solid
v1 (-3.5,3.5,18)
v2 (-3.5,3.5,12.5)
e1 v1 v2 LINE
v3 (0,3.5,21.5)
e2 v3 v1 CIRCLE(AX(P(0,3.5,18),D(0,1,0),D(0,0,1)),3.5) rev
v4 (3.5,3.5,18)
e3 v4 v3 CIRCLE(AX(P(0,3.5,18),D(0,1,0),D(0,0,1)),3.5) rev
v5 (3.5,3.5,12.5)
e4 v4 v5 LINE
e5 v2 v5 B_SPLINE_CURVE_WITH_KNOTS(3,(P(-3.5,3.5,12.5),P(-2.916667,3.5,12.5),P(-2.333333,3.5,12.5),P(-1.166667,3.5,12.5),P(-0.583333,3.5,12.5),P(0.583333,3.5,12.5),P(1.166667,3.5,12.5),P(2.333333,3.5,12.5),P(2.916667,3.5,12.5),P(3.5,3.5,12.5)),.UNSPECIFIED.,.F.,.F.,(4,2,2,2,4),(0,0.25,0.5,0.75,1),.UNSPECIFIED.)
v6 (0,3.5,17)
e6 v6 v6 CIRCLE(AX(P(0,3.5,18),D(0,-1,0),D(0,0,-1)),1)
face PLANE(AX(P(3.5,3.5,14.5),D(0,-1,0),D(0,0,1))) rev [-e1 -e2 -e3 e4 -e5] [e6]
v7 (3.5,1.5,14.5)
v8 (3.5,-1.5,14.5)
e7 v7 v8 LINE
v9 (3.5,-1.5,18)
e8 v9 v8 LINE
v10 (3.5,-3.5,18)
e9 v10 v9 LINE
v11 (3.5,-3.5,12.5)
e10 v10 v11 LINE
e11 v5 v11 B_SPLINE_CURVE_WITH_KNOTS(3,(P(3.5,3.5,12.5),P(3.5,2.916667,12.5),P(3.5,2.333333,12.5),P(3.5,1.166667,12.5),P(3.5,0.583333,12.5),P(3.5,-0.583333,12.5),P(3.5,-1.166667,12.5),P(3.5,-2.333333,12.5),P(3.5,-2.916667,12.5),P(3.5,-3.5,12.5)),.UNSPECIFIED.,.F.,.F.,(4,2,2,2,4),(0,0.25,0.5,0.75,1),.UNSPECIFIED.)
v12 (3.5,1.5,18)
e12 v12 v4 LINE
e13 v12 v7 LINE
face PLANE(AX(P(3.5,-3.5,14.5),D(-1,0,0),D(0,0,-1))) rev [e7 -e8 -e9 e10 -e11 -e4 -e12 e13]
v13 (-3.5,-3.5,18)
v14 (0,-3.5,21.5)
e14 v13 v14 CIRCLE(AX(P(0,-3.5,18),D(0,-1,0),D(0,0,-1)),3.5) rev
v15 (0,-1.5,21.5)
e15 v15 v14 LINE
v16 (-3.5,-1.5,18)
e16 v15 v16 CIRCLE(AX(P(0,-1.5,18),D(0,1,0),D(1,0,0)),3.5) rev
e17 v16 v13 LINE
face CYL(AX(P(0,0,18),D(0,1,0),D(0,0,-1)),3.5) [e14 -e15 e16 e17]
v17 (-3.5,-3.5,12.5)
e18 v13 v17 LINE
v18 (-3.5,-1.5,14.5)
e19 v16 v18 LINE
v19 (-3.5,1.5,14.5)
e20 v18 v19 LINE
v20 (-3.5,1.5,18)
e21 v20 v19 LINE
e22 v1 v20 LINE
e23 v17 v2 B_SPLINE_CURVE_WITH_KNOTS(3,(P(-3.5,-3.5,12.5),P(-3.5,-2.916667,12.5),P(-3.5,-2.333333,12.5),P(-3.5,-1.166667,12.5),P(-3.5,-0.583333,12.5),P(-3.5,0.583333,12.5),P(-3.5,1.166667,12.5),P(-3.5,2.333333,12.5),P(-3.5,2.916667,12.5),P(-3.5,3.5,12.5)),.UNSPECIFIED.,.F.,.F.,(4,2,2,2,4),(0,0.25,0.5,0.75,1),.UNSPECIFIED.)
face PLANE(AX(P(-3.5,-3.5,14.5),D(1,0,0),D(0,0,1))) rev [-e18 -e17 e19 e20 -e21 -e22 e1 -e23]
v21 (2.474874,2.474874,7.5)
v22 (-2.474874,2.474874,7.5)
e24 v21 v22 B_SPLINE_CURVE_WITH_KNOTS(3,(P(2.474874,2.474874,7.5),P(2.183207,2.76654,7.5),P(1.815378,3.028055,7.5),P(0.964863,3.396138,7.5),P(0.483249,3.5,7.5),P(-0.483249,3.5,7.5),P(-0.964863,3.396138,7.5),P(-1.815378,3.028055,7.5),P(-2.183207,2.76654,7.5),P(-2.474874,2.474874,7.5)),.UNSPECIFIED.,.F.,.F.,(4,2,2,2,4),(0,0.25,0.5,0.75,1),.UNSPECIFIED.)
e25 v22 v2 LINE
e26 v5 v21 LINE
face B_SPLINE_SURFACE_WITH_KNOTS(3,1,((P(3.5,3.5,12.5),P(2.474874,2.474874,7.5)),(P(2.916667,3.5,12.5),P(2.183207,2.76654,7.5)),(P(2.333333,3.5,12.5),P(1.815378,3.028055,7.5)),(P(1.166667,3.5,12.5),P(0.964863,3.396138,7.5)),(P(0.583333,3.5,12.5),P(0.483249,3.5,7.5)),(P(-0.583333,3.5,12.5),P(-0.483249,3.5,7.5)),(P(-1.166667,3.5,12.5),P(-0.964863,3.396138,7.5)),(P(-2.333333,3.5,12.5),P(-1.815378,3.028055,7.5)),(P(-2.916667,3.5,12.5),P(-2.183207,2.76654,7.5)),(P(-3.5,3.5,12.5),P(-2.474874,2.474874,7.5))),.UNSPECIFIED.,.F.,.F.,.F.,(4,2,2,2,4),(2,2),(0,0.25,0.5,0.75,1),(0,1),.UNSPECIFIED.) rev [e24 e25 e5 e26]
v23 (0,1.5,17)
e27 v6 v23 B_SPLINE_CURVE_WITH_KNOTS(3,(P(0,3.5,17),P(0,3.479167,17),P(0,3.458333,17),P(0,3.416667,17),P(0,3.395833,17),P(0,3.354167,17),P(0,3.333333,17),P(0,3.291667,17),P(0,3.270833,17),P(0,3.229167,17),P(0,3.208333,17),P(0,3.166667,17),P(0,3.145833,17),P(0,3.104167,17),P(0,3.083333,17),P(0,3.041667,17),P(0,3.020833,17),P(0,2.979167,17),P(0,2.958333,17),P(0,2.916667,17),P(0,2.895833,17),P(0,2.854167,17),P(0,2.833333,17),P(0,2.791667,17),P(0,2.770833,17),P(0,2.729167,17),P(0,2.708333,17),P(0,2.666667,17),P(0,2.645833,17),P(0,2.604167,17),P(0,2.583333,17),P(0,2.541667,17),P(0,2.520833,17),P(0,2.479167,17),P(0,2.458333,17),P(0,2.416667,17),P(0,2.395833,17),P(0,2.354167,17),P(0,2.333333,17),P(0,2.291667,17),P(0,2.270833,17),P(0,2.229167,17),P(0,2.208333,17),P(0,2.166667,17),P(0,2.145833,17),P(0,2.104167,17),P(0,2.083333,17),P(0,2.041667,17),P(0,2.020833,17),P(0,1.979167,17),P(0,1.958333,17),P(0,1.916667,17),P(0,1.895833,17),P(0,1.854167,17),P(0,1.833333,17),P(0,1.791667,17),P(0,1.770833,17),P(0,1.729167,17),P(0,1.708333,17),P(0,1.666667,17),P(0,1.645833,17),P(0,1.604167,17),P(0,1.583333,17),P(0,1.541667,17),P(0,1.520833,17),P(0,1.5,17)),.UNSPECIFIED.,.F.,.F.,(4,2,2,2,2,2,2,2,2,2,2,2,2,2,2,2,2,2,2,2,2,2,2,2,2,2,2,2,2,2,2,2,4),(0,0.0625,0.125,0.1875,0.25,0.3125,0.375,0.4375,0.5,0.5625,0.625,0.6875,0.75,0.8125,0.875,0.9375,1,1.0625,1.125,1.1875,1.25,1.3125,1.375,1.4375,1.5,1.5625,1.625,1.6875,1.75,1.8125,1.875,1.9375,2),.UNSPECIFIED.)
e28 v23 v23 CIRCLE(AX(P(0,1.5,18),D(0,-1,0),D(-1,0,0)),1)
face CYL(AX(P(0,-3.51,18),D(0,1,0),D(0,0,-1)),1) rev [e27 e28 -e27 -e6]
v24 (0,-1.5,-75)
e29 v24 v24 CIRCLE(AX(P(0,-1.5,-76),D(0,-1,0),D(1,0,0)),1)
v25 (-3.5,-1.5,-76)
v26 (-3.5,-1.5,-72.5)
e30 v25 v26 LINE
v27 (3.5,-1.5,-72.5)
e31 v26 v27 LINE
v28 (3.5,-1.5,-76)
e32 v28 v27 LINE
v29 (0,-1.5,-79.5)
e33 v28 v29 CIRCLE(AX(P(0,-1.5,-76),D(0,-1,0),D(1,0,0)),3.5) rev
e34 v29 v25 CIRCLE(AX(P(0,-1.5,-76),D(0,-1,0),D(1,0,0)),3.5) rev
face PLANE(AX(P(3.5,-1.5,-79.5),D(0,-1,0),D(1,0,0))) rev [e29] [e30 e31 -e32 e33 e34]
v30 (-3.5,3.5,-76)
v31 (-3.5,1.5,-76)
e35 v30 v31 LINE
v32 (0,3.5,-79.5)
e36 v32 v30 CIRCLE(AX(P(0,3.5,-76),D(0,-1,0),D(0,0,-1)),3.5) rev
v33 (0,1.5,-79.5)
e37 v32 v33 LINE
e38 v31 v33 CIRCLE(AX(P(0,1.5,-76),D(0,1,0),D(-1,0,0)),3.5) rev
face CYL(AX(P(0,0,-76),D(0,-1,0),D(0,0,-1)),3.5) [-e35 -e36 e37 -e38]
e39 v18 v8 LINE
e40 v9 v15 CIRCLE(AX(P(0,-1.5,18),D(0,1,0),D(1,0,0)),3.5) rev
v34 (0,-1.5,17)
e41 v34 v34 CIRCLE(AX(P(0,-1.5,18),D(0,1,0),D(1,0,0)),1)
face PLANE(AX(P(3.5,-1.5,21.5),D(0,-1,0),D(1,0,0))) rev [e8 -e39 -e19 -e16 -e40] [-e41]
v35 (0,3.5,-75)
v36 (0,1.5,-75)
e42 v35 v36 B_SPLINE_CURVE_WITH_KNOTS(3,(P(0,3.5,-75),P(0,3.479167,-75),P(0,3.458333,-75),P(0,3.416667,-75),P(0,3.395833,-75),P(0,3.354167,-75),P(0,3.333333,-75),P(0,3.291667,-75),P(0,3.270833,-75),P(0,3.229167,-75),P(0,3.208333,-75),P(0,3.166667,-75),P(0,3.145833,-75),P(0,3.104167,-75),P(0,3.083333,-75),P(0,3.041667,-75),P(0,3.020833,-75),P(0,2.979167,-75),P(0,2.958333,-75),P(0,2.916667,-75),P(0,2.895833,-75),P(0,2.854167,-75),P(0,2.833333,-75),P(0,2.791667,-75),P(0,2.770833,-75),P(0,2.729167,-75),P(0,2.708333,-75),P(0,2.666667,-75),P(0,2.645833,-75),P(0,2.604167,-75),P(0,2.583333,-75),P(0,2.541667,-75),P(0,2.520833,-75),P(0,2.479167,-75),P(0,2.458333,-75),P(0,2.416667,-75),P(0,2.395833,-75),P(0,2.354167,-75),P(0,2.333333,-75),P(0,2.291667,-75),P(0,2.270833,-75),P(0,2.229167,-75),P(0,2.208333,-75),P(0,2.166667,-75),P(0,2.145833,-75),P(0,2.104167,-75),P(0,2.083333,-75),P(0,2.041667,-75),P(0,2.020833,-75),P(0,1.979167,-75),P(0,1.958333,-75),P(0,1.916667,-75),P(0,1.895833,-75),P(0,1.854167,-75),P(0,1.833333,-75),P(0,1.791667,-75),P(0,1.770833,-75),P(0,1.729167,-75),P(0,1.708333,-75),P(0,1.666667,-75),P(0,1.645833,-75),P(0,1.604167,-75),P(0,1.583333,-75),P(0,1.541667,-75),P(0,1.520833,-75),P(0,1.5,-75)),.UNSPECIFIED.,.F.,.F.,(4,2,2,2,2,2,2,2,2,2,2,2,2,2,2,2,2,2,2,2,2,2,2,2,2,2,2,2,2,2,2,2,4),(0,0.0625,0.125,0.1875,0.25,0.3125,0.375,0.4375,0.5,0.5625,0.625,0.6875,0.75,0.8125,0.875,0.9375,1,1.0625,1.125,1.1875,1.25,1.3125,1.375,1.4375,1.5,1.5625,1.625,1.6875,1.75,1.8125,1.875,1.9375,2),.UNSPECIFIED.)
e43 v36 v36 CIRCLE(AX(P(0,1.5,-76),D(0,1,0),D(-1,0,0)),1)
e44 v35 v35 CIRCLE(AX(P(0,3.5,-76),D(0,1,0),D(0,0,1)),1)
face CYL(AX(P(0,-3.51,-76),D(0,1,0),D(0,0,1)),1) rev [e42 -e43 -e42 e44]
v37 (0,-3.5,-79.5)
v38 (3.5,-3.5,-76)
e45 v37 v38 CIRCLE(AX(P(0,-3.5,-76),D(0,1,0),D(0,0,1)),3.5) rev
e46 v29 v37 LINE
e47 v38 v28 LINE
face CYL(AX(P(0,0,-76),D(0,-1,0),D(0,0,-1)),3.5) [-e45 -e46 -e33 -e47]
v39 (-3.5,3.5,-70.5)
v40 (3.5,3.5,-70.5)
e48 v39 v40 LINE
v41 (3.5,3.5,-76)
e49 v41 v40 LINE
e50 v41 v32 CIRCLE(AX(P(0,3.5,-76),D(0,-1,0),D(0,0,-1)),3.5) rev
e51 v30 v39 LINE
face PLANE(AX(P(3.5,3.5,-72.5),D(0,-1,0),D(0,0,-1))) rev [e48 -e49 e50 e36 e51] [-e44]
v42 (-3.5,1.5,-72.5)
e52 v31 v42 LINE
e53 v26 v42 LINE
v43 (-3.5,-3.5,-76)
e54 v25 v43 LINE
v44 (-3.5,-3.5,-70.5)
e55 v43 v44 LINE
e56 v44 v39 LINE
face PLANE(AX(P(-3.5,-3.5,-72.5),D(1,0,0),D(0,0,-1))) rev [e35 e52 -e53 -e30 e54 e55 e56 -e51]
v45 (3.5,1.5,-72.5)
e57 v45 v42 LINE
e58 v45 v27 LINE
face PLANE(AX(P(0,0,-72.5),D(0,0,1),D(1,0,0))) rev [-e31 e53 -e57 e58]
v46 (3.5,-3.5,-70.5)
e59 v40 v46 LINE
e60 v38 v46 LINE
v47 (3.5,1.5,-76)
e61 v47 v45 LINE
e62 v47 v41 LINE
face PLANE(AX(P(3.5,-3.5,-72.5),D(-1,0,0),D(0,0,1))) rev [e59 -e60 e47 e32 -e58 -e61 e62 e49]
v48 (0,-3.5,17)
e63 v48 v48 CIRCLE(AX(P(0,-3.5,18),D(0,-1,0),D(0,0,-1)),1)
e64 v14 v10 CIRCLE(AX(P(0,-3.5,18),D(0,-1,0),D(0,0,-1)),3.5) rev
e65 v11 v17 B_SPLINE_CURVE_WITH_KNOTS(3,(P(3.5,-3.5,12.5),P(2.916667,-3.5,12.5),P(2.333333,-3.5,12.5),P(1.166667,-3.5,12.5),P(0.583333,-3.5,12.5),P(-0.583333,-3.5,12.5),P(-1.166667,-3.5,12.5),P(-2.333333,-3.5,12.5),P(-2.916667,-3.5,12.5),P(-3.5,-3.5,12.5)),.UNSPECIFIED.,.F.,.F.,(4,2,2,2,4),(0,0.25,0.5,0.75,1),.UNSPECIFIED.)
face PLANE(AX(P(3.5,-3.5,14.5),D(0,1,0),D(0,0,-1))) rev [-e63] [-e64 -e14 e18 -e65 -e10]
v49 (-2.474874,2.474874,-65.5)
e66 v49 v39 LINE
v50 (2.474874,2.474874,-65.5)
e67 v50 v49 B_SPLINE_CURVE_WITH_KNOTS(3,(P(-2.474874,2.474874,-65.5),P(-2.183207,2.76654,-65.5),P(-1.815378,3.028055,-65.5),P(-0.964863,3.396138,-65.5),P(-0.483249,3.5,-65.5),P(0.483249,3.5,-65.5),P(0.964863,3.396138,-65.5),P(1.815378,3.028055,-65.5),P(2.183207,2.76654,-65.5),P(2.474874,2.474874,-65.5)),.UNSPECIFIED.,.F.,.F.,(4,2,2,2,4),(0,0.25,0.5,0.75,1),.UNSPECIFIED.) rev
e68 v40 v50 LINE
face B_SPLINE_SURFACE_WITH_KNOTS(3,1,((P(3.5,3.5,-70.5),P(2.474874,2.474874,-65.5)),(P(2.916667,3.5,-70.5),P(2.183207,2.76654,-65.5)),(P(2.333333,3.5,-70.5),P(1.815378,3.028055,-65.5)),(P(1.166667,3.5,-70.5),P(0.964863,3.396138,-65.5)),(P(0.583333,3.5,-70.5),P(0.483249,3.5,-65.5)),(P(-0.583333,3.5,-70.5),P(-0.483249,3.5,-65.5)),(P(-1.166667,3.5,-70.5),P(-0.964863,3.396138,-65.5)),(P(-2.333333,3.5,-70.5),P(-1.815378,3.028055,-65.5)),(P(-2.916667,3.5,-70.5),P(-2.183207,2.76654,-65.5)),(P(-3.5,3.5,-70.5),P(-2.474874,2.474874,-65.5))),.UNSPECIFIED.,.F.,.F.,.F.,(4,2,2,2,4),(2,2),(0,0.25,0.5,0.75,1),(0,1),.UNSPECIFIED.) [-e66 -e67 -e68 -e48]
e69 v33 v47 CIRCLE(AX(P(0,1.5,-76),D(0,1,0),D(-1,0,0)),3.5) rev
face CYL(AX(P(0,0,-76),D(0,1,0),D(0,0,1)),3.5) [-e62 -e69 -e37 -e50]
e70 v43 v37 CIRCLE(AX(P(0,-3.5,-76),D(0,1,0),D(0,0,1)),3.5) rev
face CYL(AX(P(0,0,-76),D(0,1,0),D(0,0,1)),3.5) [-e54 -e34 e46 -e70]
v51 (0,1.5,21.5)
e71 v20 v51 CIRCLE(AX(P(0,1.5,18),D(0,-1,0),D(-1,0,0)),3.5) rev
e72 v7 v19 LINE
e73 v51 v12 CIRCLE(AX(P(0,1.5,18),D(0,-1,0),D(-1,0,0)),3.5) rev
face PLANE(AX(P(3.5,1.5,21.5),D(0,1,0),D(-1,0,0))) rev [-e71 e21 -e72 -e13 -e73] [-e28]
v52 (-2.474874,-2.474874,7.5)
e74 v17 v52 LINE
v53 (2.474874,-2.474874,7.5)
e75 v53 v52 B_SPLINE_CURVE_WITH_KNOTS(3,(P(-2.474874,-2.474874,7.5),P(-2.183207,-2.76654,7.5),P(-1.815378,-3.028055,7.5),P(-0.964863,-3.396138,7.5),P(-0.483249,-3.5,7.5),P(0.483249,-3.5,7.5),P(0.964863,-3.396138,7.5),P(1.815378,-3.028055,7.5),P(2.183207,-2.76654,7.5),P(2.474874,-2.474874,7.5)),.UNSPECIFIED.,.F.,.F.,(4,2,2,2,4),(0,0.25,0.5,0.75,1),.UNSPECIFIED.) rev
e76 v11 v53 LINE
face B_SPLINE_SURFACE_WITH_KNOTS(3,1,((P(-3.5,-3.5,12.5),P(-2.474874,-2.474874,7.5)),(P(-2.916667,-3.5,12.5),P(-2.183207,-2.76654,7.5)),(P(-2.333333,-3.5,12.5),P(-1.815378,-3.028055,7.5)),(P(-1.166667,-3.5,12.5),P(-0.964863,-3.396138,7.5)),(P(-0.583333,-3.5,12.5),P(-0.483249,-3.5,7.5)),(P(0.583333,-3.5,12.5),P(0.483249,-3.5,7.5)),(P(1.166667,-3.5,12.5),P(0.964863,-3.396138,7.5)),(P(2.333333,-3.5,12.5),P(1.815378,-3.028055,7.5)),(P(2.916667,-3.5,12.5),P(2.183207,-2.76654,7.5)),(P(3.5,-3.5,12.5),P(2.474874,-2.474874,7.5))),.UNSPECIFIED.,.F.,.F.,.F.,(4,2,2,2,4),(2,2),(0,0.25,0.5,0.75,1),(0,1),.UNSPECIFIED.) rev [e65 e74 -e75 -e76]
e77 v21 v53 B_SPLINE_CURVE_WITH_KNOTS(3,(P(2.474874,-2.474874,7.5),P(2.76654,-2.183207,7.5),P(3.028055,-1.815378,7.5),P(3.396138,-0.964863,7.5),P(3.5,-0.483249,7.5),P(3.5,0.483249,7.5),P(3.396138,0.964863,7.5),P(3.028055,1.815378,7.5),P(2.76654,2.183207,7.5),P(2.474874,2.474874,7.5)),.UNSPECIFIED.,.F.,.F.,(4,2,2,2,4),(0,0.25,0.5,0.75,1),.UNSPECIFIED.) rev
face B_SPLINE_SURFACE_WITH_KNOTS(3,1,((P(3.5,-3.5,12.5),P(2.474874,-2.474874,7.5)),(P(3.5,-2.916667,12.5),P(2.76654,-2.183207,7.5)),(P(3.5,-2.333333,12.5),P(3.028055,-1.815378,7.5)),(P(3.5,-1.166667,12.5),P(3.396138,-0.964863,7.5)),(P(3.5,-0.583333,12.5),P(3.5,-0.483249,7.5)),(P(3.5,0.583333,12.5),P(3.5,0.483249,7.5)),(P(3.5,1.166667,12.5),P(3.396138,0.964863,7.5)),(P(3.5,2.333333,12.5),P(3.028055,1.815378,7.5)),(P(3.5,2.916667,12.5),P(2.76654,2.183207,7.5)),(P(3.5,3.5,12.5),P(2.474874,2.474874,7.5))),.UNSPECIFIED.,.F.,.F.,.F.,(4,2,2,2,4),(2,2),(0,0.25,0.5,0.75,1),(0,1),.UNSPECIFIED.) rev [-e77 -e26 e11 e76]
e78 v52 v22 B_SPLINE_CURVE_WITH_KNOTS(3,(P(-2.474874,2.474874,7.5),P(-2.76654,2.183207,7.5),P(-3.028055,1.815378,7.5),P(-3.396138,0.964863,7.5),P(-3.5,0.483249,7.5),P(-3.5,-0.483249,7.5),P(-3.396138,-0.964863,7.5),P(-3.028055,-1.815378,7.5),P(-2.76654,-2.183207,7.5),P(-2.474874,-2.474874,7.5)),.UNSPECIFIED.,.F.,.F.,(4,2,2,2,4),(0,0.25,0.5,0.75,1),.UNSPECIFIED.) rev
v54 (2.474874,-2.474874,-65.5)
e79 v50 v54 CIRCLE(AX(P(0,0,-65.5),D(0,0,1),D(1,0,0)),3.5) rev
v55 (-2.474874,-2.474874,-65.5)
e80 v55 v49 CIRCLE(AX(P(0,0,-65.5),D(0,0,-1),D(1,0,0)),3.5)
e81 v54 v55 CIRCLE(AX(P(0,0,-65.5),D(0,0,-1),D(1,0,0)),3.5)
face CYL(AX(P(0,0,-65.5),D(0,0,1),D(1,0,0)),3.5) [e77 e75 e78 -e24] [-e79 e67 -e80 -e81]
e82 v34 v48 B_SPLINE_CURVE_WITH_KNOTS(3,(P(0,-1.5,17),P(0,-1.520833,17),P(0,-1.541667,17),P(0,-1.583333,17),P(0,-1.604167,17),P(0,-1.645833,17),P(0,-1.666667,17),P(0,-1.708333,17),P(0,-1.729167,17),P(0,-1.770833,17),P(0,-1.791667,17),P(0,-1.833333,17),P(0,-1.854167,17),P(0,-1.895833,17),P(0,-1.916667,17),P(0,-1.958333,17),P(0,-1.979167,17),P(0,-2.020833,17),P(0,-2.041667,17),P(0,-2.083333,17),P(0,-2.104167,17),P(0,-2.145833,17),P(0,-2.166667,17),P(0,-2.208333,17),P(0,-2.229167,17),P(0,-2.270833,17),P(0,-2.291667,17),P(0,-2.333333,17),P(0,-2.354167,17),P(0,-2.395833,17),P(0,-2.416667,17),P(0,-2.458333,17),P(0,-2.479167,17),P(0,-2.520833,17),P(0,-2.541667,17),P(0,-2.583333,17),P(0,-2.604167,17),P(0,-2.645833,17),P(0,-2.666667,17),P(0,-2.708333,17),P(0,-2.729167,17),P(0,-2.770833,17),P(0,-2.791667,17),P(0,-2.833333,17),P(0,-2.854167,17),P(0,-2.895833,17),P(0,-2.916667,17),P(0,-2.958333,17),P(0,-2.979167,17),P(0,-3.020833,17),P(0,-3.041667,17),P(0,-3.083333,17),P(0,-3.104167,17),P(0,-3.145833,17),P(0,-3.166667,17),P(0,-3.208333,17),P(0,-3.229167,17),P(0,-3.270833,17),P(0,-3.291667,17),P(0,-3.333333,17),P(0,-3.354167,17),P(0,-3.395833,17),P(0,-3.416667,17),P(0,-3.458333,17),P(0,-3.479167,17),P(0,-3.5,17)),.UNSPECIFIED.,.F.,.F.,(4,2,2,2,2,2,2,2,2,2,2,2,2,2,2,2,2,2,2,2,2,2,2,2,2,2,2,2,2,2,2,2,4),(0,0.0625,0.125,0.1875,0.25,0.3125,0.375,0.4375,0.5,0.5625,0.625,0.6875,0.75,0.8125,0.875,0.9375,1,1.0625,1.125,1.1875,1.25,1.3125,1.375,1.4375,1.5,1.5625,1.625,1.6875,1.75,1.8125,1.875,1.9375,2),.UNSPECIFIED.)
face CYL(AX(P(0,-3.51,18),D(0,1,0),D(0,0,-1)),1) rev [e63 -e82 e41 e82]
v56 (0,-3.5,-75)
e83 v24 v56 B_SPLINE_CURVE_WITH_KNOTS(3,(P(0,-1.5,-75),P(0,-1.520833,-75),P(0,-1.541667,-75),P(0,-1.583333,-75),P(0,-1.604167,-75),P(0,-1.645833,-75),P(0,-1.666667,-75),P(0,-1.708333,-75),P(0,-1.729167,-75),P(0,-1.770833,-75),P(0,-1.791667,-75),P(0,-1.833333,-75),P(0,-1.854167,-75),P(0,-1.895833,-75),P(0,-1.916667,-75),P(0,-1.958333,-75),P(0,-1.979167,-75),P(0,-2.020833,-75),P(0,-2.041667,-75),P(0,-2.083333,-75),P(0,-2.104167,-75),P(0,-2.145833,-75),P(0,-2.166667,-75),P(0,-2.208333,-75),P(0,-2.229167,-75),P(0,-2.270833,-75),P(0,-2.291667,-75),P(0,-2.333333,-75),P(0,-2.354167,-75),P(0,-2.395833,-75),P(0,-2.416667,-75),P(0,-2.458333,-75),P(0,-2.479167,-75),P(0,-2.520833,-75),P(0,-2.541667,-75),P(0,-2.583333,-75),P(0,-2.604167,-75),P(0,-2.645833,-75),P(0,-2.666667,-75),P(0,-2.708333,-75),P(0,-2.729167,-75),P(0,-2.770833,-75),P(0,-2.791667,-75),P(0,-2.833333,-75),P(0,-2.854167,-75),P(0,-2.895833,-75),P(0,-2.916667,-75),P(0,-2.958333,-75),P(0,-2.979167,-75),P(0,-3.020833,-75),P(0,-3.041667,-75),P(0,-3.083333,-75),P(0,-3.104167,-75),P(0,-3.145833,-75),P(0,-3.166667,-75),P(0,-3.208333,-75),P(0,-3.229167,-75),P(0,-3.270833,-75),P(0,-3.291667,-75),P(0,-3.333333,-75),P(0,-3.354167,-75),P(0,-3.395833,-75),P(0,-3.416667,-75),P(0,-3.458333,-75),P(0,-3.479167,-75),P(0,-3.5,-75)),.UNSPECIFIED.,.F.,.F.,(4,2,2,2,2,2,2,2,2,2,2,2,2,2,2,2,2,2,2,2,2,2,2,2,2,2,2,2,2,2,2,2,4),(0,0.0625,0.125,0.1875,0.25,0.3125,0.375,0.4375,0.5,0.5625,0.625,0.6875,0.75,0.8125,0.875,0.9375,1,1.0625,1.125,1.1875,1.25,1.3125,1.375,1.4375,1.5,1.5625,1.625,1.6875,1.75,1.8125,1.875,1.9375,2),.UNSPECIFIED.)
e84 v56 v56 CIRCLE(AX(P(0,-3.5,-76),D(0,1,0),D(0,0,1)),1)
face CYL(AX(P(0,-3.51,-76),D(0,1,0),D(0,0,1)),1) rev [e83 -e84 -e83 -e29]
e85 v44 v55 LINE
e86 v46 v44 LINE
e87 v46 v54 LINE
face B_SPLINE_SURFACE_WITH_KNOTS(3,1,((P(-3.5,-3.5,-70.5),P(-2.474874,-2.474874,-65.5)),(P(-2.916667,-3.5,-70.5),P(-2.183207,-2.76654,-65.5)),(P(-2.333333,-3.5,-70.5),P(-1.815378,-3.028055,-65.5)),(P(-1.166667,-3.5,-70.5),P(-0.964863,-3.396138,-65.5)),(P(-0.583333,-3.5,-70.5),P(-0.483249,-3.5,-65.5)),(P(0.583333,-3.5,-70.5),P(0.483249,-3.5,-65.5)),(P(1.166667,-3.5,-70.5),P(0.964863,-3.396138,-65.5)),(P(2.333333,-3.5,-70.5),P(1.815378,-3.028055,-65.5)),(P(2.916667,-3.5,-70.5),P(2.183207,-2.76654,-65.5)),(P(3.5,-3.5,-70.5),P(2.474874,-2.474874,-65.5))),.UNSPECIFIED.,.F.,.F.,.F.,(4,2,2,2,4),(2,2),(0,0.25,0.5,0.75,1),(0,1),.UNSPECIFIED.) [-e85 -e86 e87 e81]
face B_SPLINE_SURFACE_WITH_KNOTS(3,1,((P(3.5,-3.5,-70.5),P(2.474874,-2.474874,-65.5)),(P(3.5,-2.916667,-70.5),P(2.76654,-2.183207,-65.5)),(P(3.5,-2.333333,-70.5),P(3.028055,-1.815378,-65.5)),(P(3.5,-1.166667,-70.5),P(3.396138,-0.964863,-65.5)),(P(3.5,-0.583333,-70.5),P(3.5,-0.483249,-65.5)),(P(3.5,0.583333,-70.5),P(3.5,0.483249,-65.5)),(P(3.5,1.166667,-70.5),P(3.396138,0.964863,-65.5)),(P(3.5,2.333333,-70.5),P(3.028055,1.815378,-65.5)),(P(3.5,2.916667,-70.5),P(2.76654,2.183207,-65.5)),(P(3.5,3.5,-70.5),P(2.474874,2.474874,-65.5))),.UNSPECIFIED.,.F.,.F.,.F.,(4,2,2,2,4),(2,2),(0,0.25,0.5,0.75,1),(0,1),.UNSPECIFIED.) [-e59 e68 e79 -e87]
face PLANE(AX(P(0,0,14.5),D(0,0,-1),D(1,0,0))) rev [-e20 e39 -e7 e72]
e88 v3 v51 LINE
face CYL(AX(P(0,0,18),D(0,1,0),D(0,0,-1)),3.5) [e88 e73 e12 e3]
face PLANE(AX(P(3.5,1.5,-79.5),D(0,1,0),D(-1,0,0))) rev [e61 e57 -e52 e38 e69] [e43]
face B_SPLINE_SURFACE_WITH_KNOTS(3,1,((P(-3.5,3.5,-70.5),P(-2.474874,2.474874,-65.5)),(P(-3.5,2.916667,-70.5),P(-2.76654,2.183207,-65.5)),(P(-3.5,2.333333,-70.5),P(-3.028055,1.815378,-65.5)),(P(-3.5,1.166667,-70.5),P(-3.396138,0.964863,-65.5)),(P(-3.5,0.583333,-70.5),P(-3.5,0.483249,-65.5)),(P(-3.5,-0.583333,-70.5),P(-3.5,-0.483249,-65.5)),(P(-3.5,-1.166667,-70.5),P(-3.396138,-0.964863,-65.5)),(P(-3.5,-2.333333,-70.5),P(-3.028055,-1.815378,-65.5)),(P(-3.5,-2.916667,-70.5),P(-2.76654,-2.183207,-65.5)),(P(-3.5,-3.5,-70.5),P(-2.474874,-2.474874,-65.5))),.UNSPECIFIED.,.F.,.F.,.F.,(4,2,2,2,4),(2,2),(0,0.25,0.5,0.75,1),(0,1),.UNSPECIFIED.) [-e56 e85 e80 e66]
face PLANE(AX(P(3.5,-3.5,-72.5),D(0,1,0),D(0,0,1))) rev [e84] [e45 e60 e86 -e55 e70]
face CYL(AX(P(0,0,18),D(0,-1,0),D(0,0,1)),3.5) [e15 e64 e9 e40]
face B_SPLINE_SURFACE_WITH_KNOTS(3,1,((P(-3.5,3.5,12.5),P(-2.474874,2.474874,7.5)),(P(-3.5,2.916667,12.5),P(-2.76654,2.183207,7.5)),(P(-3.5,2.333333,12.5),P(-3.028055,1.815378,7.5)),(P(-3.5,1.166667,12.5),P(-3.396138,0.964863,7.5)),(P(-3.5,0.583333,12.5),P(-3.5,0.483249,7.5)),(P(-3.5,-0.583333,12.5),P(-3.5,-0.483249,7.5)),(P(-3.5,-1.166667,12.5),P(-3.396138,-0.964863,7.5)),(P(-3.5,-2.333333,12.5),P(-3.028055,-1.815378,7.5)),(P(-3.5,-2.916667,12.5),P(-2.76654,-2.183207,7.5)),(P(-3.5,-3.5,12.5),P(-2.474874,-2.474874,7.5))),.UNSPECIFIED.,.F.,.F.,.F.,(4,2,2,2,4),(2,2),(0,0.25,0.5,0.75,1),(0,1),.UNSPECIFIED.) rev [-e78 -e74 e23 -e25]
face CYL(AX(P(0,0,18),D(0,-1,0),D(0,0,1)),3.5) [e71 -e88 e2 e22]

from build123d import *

# Parameters (mm, degrees)
SKETCH1_R           = 3.5
BOSS_EXTRUDE1_DEPTH = 65.5
SKETCH3_2_W         = 7
SKETCH3_2_H         = 7
BOSS_EXTRUDE3_DEPTH = 2
SKETCH4_W           = 7
SKETCH4_H           = 2
BOSS_EXTRUDE2_DEPTH = 7
SKETCH5_R           = 1
CUT_EXTRUDE1_DEPTH  = 80.884291435
FILLET1_R           = 3.5


with BuildPart() as part:
    # Sketch1 → Boss-Extrude1 (new body)
    with BuildSketch(Plane.XY):
        Circle(SKETCH1_R)
    extrude(amount=-BOSS_EXTRUDE1_DEPTH)

    # Loft1: read off the stored shape, not the designer's step
    # Loft1: loft between two sections, ruled curve by curve
    loft1_from = [
        Edge.make_bspline([(-3.5, 3.5, -70.5), (-3.5, 2.916666667, -70.5), (-3.5, 2.333333333, -70.5), (-3.5, 1.166666667, -70.5), (-3.5, 0.583333333, -70.5), (-3.5, -0.583333333, -70.5), (-3.5, -1.166666667, -70.5), (-3.5, -2.333333333, -70.5), (-3.5, -2.916666667, -70.5), (-3.5, -3.5, -70.5)], [0, 0, 0, 0, 0.25, 0.25, 0.5, 0.5, 0.75, 0.75, 1, 1, 1, 1], 3),
        Edge.make_bspline([(-3.5, -3.5, -70.5), (-2.916666667, -3.5, -70.5), (-2.333333333, -3.5, -70.5), (-1.166666667, -3.5, -70.5), (-0.583333333, -3.5, -70.5), (0.583333333, -3.5, -70.5), (1.166666667, -3.5, -70.5), (2.333333333, -3.5, -70.5), (2.916666667, -3.5, -70.5), (3.5, -3.5, -70.5)], [0, 0, 0, 0, 0.25, 0.25, 0.5, 0.5, 0.75, 0.75, 1, 1, 1, 1], 3),
        Edge.make_bspline([(3.5, 3.5, -70.5), (2.916666667, 3.5, -70.5), (2.333333333, 3.5, -70.5), (1.166666667, 3.5, -70.5), (0.583333333, 3.5, -70.5), (-0.583333333, 3.5, -70.5), (-1.166666667, 3.5, -70.5), (-2.333333333, 3.5, -70.5), (-2.916666667, 3.5, -70.5), (-3.5, 3.5, -70.5)], [0, 0, 0, 0, 0.25, 0.25, 0.5, 0.5, 0.75, 0.75, 1, 1, 1, 1], 3),
        Edge.make_bspline([(3.5, -3.5, -70.5), (3.5, -2.916666667, -70.5), (3.5, -2.333333333, -70.5), (3.5, -1.166666667, -70.5), (3.5, -0.583333333, -70.5), (3.5, 0.583333333, -70.5), (3.5, 1.166666667, -70.5), (3.5, 2.333333333, -70.5), (3.5, 2.916666667, -70.5), (3.5, 3.5, -70.5)], [0, 0, 0, 0, 0.25, 0.25, 0.5, 0.5, 0.75, 0.75, 1, 1, 1, 1], 3),
    ]
    loft1_to = [
        Edge.make_bspline([(-2.474873734, 2.474873734, -65.5), (-2.766540401, 2.183207067, -65.5), (-3.028055087, 1.815378049, -65.5), (-3.396138059, 0.964863384, -65.5), (-3.5, 0.483249156, -65.5), (-3.5, -0.483249156, -65.5), (-3.396138059, -0.964863384, -65.5), (-3.028055087, -1.815378049, -65.5), (-2.766540401, -2.183207067, -65.5), (-2.474873734, -2.474873734, -65.5)], [0, 0, 0, 0, 0.25, 0.25, 0.5, 0.5, 0.75, 0.75, 1, 1, 1, 1], 3),
        Edge.make_bspline([(-2.474873734, -2.474873734, -65.5), (-2.183207067, -2.766540401, -65.5), (-1.815378049, -3.028055087, -65.5), (-0.964863384, -3.396138059, -65.5), (-0.483249156, -3.5, -65.5), (0.483249156, -3.5, -65.5), (0.964863384, -3.396138059, -65.5), (1.815378049, -3.028055087, -65.5), (2.183207067, -2.766540401, -65.5), (2.474873734, -2.474873734, -65.5)], [0, 0, 0, 0, 0.25, 0.25, 0.5, 0.5, 0.75, 0.75, 1, 1, 1, 1], 3),
        Edge.make_bspline([(2.474873734, 2.474873734, -65.5), (2.183207067, 2.766540401, -65.5), (1.815378049, 3.028055087, -65.5), (0.964863384, 3.396138059, -65.5), (0.483249156, 3.5, -65.5), (-0.483249156, 3.5, -65.5), (-0.964863384, 3.396138059, -65.5), (-1.815378049, 3.028055087, -65.5), (-2.183207067, 2.766540401, -65.5), (-2.474873734, 2.474873734, -65.5)], [0, 0, 0, 0, 0.25, 0.25, 0.5, 0.5, 0.75, 0.75, 1, 1, 1, 1], 3),
        Edge.make_bspline([(2.474873734, -2.474873734, -65.5), (2.766540401, -2.183207067, -65.5), (3.028055087, -1.815378049, -65.5), (3.396138059, -0.964863384, -65.5), (3.5, -0.483249156, -65.5), (3.5, 0.483249156, -65.5), (3.396138059, 0.964863384, -65.5), (3.028055087, 1.815378049, -65.5), (2.766540401, 2.183207067, -65.5), (2.474873734, 2.474873734, -65.5)], [0, 0, 0, 0, 0.25, 0.25, 0.5, 0.5, 0.75, 0.75, 1, 1, 1, 1], 3),
    ]
    loft1 = Solid(Shell([*[Face.make_surface_from_curves(loft1_from[k], loft1_to[k]) for k in range(4)], Face(Wire(loft1_from)), Face(Wire(loft1_to))]))
    add(loft1)

    # Sketch3<2> → Boss-Extrude3 (add)
    with BuildSketch(Plane(origin=(0, 0, -70.5), x_dir=(-1, 0, 0), z_dir=(0, 0, -1))):
        Rectangle(SKETCH3_2_W, SKETCH3_2_H)
    extrude(amount=BOSS_EXTRUDE3_DEPTH)

    # Sketch4 → Boss-Extrude2 (add)
    with BuildSketch(Plane(origin=(0, 0, -72.5), x_dir=(-1, 0, 0), z_dir=(0, 0, -1))):
        with Locations((0, 2.5)):
            Rectangle(SKETCH4_W, SKETCH4_H)
        with Locations((0, -2.5)):
            Rectangle(SKETCH4_W, SKETCH4_H)
    extrude(amount=BOSS_EXTRUDE2_DEPTH)

    # Sketch5 → Cut-Extrude1 (cut, through all)
    with BuildSketch(Plane(origin=(0, 3.5, 0), x_dir=(1, 0, 0), z_dir=(0, 1, 0))):
        with Locations(Location((0, 76, 0), (0, 0, 270))):
            Circle(SKETCH5_R)
    extrude(amount=-CUT_EXTRUDE1_DEPTH, mode=Mode.SUBTRACT)

    # Fillet1
    fillet1_edges = [part.edges().sort_by_distance(p)[0] for p in [
        (-3.5, -2.5, -79.5),
        (-3.5, 2.5, -79.5),
        (3.5, -2.5, -79.5),
        (3.5, 2.5, -79.5),
    ]]
    fillet(fillet1_edges, radius=FILLET1_R - 0.0001)  # a hair under: the kernel refuses the full size

    # Mirror6: part across plane


with BuildPart() as part_1:
    add(part.part)
    add(part.part.mirror(Plane.XY.offset(-29)))


solid = part_1.part
